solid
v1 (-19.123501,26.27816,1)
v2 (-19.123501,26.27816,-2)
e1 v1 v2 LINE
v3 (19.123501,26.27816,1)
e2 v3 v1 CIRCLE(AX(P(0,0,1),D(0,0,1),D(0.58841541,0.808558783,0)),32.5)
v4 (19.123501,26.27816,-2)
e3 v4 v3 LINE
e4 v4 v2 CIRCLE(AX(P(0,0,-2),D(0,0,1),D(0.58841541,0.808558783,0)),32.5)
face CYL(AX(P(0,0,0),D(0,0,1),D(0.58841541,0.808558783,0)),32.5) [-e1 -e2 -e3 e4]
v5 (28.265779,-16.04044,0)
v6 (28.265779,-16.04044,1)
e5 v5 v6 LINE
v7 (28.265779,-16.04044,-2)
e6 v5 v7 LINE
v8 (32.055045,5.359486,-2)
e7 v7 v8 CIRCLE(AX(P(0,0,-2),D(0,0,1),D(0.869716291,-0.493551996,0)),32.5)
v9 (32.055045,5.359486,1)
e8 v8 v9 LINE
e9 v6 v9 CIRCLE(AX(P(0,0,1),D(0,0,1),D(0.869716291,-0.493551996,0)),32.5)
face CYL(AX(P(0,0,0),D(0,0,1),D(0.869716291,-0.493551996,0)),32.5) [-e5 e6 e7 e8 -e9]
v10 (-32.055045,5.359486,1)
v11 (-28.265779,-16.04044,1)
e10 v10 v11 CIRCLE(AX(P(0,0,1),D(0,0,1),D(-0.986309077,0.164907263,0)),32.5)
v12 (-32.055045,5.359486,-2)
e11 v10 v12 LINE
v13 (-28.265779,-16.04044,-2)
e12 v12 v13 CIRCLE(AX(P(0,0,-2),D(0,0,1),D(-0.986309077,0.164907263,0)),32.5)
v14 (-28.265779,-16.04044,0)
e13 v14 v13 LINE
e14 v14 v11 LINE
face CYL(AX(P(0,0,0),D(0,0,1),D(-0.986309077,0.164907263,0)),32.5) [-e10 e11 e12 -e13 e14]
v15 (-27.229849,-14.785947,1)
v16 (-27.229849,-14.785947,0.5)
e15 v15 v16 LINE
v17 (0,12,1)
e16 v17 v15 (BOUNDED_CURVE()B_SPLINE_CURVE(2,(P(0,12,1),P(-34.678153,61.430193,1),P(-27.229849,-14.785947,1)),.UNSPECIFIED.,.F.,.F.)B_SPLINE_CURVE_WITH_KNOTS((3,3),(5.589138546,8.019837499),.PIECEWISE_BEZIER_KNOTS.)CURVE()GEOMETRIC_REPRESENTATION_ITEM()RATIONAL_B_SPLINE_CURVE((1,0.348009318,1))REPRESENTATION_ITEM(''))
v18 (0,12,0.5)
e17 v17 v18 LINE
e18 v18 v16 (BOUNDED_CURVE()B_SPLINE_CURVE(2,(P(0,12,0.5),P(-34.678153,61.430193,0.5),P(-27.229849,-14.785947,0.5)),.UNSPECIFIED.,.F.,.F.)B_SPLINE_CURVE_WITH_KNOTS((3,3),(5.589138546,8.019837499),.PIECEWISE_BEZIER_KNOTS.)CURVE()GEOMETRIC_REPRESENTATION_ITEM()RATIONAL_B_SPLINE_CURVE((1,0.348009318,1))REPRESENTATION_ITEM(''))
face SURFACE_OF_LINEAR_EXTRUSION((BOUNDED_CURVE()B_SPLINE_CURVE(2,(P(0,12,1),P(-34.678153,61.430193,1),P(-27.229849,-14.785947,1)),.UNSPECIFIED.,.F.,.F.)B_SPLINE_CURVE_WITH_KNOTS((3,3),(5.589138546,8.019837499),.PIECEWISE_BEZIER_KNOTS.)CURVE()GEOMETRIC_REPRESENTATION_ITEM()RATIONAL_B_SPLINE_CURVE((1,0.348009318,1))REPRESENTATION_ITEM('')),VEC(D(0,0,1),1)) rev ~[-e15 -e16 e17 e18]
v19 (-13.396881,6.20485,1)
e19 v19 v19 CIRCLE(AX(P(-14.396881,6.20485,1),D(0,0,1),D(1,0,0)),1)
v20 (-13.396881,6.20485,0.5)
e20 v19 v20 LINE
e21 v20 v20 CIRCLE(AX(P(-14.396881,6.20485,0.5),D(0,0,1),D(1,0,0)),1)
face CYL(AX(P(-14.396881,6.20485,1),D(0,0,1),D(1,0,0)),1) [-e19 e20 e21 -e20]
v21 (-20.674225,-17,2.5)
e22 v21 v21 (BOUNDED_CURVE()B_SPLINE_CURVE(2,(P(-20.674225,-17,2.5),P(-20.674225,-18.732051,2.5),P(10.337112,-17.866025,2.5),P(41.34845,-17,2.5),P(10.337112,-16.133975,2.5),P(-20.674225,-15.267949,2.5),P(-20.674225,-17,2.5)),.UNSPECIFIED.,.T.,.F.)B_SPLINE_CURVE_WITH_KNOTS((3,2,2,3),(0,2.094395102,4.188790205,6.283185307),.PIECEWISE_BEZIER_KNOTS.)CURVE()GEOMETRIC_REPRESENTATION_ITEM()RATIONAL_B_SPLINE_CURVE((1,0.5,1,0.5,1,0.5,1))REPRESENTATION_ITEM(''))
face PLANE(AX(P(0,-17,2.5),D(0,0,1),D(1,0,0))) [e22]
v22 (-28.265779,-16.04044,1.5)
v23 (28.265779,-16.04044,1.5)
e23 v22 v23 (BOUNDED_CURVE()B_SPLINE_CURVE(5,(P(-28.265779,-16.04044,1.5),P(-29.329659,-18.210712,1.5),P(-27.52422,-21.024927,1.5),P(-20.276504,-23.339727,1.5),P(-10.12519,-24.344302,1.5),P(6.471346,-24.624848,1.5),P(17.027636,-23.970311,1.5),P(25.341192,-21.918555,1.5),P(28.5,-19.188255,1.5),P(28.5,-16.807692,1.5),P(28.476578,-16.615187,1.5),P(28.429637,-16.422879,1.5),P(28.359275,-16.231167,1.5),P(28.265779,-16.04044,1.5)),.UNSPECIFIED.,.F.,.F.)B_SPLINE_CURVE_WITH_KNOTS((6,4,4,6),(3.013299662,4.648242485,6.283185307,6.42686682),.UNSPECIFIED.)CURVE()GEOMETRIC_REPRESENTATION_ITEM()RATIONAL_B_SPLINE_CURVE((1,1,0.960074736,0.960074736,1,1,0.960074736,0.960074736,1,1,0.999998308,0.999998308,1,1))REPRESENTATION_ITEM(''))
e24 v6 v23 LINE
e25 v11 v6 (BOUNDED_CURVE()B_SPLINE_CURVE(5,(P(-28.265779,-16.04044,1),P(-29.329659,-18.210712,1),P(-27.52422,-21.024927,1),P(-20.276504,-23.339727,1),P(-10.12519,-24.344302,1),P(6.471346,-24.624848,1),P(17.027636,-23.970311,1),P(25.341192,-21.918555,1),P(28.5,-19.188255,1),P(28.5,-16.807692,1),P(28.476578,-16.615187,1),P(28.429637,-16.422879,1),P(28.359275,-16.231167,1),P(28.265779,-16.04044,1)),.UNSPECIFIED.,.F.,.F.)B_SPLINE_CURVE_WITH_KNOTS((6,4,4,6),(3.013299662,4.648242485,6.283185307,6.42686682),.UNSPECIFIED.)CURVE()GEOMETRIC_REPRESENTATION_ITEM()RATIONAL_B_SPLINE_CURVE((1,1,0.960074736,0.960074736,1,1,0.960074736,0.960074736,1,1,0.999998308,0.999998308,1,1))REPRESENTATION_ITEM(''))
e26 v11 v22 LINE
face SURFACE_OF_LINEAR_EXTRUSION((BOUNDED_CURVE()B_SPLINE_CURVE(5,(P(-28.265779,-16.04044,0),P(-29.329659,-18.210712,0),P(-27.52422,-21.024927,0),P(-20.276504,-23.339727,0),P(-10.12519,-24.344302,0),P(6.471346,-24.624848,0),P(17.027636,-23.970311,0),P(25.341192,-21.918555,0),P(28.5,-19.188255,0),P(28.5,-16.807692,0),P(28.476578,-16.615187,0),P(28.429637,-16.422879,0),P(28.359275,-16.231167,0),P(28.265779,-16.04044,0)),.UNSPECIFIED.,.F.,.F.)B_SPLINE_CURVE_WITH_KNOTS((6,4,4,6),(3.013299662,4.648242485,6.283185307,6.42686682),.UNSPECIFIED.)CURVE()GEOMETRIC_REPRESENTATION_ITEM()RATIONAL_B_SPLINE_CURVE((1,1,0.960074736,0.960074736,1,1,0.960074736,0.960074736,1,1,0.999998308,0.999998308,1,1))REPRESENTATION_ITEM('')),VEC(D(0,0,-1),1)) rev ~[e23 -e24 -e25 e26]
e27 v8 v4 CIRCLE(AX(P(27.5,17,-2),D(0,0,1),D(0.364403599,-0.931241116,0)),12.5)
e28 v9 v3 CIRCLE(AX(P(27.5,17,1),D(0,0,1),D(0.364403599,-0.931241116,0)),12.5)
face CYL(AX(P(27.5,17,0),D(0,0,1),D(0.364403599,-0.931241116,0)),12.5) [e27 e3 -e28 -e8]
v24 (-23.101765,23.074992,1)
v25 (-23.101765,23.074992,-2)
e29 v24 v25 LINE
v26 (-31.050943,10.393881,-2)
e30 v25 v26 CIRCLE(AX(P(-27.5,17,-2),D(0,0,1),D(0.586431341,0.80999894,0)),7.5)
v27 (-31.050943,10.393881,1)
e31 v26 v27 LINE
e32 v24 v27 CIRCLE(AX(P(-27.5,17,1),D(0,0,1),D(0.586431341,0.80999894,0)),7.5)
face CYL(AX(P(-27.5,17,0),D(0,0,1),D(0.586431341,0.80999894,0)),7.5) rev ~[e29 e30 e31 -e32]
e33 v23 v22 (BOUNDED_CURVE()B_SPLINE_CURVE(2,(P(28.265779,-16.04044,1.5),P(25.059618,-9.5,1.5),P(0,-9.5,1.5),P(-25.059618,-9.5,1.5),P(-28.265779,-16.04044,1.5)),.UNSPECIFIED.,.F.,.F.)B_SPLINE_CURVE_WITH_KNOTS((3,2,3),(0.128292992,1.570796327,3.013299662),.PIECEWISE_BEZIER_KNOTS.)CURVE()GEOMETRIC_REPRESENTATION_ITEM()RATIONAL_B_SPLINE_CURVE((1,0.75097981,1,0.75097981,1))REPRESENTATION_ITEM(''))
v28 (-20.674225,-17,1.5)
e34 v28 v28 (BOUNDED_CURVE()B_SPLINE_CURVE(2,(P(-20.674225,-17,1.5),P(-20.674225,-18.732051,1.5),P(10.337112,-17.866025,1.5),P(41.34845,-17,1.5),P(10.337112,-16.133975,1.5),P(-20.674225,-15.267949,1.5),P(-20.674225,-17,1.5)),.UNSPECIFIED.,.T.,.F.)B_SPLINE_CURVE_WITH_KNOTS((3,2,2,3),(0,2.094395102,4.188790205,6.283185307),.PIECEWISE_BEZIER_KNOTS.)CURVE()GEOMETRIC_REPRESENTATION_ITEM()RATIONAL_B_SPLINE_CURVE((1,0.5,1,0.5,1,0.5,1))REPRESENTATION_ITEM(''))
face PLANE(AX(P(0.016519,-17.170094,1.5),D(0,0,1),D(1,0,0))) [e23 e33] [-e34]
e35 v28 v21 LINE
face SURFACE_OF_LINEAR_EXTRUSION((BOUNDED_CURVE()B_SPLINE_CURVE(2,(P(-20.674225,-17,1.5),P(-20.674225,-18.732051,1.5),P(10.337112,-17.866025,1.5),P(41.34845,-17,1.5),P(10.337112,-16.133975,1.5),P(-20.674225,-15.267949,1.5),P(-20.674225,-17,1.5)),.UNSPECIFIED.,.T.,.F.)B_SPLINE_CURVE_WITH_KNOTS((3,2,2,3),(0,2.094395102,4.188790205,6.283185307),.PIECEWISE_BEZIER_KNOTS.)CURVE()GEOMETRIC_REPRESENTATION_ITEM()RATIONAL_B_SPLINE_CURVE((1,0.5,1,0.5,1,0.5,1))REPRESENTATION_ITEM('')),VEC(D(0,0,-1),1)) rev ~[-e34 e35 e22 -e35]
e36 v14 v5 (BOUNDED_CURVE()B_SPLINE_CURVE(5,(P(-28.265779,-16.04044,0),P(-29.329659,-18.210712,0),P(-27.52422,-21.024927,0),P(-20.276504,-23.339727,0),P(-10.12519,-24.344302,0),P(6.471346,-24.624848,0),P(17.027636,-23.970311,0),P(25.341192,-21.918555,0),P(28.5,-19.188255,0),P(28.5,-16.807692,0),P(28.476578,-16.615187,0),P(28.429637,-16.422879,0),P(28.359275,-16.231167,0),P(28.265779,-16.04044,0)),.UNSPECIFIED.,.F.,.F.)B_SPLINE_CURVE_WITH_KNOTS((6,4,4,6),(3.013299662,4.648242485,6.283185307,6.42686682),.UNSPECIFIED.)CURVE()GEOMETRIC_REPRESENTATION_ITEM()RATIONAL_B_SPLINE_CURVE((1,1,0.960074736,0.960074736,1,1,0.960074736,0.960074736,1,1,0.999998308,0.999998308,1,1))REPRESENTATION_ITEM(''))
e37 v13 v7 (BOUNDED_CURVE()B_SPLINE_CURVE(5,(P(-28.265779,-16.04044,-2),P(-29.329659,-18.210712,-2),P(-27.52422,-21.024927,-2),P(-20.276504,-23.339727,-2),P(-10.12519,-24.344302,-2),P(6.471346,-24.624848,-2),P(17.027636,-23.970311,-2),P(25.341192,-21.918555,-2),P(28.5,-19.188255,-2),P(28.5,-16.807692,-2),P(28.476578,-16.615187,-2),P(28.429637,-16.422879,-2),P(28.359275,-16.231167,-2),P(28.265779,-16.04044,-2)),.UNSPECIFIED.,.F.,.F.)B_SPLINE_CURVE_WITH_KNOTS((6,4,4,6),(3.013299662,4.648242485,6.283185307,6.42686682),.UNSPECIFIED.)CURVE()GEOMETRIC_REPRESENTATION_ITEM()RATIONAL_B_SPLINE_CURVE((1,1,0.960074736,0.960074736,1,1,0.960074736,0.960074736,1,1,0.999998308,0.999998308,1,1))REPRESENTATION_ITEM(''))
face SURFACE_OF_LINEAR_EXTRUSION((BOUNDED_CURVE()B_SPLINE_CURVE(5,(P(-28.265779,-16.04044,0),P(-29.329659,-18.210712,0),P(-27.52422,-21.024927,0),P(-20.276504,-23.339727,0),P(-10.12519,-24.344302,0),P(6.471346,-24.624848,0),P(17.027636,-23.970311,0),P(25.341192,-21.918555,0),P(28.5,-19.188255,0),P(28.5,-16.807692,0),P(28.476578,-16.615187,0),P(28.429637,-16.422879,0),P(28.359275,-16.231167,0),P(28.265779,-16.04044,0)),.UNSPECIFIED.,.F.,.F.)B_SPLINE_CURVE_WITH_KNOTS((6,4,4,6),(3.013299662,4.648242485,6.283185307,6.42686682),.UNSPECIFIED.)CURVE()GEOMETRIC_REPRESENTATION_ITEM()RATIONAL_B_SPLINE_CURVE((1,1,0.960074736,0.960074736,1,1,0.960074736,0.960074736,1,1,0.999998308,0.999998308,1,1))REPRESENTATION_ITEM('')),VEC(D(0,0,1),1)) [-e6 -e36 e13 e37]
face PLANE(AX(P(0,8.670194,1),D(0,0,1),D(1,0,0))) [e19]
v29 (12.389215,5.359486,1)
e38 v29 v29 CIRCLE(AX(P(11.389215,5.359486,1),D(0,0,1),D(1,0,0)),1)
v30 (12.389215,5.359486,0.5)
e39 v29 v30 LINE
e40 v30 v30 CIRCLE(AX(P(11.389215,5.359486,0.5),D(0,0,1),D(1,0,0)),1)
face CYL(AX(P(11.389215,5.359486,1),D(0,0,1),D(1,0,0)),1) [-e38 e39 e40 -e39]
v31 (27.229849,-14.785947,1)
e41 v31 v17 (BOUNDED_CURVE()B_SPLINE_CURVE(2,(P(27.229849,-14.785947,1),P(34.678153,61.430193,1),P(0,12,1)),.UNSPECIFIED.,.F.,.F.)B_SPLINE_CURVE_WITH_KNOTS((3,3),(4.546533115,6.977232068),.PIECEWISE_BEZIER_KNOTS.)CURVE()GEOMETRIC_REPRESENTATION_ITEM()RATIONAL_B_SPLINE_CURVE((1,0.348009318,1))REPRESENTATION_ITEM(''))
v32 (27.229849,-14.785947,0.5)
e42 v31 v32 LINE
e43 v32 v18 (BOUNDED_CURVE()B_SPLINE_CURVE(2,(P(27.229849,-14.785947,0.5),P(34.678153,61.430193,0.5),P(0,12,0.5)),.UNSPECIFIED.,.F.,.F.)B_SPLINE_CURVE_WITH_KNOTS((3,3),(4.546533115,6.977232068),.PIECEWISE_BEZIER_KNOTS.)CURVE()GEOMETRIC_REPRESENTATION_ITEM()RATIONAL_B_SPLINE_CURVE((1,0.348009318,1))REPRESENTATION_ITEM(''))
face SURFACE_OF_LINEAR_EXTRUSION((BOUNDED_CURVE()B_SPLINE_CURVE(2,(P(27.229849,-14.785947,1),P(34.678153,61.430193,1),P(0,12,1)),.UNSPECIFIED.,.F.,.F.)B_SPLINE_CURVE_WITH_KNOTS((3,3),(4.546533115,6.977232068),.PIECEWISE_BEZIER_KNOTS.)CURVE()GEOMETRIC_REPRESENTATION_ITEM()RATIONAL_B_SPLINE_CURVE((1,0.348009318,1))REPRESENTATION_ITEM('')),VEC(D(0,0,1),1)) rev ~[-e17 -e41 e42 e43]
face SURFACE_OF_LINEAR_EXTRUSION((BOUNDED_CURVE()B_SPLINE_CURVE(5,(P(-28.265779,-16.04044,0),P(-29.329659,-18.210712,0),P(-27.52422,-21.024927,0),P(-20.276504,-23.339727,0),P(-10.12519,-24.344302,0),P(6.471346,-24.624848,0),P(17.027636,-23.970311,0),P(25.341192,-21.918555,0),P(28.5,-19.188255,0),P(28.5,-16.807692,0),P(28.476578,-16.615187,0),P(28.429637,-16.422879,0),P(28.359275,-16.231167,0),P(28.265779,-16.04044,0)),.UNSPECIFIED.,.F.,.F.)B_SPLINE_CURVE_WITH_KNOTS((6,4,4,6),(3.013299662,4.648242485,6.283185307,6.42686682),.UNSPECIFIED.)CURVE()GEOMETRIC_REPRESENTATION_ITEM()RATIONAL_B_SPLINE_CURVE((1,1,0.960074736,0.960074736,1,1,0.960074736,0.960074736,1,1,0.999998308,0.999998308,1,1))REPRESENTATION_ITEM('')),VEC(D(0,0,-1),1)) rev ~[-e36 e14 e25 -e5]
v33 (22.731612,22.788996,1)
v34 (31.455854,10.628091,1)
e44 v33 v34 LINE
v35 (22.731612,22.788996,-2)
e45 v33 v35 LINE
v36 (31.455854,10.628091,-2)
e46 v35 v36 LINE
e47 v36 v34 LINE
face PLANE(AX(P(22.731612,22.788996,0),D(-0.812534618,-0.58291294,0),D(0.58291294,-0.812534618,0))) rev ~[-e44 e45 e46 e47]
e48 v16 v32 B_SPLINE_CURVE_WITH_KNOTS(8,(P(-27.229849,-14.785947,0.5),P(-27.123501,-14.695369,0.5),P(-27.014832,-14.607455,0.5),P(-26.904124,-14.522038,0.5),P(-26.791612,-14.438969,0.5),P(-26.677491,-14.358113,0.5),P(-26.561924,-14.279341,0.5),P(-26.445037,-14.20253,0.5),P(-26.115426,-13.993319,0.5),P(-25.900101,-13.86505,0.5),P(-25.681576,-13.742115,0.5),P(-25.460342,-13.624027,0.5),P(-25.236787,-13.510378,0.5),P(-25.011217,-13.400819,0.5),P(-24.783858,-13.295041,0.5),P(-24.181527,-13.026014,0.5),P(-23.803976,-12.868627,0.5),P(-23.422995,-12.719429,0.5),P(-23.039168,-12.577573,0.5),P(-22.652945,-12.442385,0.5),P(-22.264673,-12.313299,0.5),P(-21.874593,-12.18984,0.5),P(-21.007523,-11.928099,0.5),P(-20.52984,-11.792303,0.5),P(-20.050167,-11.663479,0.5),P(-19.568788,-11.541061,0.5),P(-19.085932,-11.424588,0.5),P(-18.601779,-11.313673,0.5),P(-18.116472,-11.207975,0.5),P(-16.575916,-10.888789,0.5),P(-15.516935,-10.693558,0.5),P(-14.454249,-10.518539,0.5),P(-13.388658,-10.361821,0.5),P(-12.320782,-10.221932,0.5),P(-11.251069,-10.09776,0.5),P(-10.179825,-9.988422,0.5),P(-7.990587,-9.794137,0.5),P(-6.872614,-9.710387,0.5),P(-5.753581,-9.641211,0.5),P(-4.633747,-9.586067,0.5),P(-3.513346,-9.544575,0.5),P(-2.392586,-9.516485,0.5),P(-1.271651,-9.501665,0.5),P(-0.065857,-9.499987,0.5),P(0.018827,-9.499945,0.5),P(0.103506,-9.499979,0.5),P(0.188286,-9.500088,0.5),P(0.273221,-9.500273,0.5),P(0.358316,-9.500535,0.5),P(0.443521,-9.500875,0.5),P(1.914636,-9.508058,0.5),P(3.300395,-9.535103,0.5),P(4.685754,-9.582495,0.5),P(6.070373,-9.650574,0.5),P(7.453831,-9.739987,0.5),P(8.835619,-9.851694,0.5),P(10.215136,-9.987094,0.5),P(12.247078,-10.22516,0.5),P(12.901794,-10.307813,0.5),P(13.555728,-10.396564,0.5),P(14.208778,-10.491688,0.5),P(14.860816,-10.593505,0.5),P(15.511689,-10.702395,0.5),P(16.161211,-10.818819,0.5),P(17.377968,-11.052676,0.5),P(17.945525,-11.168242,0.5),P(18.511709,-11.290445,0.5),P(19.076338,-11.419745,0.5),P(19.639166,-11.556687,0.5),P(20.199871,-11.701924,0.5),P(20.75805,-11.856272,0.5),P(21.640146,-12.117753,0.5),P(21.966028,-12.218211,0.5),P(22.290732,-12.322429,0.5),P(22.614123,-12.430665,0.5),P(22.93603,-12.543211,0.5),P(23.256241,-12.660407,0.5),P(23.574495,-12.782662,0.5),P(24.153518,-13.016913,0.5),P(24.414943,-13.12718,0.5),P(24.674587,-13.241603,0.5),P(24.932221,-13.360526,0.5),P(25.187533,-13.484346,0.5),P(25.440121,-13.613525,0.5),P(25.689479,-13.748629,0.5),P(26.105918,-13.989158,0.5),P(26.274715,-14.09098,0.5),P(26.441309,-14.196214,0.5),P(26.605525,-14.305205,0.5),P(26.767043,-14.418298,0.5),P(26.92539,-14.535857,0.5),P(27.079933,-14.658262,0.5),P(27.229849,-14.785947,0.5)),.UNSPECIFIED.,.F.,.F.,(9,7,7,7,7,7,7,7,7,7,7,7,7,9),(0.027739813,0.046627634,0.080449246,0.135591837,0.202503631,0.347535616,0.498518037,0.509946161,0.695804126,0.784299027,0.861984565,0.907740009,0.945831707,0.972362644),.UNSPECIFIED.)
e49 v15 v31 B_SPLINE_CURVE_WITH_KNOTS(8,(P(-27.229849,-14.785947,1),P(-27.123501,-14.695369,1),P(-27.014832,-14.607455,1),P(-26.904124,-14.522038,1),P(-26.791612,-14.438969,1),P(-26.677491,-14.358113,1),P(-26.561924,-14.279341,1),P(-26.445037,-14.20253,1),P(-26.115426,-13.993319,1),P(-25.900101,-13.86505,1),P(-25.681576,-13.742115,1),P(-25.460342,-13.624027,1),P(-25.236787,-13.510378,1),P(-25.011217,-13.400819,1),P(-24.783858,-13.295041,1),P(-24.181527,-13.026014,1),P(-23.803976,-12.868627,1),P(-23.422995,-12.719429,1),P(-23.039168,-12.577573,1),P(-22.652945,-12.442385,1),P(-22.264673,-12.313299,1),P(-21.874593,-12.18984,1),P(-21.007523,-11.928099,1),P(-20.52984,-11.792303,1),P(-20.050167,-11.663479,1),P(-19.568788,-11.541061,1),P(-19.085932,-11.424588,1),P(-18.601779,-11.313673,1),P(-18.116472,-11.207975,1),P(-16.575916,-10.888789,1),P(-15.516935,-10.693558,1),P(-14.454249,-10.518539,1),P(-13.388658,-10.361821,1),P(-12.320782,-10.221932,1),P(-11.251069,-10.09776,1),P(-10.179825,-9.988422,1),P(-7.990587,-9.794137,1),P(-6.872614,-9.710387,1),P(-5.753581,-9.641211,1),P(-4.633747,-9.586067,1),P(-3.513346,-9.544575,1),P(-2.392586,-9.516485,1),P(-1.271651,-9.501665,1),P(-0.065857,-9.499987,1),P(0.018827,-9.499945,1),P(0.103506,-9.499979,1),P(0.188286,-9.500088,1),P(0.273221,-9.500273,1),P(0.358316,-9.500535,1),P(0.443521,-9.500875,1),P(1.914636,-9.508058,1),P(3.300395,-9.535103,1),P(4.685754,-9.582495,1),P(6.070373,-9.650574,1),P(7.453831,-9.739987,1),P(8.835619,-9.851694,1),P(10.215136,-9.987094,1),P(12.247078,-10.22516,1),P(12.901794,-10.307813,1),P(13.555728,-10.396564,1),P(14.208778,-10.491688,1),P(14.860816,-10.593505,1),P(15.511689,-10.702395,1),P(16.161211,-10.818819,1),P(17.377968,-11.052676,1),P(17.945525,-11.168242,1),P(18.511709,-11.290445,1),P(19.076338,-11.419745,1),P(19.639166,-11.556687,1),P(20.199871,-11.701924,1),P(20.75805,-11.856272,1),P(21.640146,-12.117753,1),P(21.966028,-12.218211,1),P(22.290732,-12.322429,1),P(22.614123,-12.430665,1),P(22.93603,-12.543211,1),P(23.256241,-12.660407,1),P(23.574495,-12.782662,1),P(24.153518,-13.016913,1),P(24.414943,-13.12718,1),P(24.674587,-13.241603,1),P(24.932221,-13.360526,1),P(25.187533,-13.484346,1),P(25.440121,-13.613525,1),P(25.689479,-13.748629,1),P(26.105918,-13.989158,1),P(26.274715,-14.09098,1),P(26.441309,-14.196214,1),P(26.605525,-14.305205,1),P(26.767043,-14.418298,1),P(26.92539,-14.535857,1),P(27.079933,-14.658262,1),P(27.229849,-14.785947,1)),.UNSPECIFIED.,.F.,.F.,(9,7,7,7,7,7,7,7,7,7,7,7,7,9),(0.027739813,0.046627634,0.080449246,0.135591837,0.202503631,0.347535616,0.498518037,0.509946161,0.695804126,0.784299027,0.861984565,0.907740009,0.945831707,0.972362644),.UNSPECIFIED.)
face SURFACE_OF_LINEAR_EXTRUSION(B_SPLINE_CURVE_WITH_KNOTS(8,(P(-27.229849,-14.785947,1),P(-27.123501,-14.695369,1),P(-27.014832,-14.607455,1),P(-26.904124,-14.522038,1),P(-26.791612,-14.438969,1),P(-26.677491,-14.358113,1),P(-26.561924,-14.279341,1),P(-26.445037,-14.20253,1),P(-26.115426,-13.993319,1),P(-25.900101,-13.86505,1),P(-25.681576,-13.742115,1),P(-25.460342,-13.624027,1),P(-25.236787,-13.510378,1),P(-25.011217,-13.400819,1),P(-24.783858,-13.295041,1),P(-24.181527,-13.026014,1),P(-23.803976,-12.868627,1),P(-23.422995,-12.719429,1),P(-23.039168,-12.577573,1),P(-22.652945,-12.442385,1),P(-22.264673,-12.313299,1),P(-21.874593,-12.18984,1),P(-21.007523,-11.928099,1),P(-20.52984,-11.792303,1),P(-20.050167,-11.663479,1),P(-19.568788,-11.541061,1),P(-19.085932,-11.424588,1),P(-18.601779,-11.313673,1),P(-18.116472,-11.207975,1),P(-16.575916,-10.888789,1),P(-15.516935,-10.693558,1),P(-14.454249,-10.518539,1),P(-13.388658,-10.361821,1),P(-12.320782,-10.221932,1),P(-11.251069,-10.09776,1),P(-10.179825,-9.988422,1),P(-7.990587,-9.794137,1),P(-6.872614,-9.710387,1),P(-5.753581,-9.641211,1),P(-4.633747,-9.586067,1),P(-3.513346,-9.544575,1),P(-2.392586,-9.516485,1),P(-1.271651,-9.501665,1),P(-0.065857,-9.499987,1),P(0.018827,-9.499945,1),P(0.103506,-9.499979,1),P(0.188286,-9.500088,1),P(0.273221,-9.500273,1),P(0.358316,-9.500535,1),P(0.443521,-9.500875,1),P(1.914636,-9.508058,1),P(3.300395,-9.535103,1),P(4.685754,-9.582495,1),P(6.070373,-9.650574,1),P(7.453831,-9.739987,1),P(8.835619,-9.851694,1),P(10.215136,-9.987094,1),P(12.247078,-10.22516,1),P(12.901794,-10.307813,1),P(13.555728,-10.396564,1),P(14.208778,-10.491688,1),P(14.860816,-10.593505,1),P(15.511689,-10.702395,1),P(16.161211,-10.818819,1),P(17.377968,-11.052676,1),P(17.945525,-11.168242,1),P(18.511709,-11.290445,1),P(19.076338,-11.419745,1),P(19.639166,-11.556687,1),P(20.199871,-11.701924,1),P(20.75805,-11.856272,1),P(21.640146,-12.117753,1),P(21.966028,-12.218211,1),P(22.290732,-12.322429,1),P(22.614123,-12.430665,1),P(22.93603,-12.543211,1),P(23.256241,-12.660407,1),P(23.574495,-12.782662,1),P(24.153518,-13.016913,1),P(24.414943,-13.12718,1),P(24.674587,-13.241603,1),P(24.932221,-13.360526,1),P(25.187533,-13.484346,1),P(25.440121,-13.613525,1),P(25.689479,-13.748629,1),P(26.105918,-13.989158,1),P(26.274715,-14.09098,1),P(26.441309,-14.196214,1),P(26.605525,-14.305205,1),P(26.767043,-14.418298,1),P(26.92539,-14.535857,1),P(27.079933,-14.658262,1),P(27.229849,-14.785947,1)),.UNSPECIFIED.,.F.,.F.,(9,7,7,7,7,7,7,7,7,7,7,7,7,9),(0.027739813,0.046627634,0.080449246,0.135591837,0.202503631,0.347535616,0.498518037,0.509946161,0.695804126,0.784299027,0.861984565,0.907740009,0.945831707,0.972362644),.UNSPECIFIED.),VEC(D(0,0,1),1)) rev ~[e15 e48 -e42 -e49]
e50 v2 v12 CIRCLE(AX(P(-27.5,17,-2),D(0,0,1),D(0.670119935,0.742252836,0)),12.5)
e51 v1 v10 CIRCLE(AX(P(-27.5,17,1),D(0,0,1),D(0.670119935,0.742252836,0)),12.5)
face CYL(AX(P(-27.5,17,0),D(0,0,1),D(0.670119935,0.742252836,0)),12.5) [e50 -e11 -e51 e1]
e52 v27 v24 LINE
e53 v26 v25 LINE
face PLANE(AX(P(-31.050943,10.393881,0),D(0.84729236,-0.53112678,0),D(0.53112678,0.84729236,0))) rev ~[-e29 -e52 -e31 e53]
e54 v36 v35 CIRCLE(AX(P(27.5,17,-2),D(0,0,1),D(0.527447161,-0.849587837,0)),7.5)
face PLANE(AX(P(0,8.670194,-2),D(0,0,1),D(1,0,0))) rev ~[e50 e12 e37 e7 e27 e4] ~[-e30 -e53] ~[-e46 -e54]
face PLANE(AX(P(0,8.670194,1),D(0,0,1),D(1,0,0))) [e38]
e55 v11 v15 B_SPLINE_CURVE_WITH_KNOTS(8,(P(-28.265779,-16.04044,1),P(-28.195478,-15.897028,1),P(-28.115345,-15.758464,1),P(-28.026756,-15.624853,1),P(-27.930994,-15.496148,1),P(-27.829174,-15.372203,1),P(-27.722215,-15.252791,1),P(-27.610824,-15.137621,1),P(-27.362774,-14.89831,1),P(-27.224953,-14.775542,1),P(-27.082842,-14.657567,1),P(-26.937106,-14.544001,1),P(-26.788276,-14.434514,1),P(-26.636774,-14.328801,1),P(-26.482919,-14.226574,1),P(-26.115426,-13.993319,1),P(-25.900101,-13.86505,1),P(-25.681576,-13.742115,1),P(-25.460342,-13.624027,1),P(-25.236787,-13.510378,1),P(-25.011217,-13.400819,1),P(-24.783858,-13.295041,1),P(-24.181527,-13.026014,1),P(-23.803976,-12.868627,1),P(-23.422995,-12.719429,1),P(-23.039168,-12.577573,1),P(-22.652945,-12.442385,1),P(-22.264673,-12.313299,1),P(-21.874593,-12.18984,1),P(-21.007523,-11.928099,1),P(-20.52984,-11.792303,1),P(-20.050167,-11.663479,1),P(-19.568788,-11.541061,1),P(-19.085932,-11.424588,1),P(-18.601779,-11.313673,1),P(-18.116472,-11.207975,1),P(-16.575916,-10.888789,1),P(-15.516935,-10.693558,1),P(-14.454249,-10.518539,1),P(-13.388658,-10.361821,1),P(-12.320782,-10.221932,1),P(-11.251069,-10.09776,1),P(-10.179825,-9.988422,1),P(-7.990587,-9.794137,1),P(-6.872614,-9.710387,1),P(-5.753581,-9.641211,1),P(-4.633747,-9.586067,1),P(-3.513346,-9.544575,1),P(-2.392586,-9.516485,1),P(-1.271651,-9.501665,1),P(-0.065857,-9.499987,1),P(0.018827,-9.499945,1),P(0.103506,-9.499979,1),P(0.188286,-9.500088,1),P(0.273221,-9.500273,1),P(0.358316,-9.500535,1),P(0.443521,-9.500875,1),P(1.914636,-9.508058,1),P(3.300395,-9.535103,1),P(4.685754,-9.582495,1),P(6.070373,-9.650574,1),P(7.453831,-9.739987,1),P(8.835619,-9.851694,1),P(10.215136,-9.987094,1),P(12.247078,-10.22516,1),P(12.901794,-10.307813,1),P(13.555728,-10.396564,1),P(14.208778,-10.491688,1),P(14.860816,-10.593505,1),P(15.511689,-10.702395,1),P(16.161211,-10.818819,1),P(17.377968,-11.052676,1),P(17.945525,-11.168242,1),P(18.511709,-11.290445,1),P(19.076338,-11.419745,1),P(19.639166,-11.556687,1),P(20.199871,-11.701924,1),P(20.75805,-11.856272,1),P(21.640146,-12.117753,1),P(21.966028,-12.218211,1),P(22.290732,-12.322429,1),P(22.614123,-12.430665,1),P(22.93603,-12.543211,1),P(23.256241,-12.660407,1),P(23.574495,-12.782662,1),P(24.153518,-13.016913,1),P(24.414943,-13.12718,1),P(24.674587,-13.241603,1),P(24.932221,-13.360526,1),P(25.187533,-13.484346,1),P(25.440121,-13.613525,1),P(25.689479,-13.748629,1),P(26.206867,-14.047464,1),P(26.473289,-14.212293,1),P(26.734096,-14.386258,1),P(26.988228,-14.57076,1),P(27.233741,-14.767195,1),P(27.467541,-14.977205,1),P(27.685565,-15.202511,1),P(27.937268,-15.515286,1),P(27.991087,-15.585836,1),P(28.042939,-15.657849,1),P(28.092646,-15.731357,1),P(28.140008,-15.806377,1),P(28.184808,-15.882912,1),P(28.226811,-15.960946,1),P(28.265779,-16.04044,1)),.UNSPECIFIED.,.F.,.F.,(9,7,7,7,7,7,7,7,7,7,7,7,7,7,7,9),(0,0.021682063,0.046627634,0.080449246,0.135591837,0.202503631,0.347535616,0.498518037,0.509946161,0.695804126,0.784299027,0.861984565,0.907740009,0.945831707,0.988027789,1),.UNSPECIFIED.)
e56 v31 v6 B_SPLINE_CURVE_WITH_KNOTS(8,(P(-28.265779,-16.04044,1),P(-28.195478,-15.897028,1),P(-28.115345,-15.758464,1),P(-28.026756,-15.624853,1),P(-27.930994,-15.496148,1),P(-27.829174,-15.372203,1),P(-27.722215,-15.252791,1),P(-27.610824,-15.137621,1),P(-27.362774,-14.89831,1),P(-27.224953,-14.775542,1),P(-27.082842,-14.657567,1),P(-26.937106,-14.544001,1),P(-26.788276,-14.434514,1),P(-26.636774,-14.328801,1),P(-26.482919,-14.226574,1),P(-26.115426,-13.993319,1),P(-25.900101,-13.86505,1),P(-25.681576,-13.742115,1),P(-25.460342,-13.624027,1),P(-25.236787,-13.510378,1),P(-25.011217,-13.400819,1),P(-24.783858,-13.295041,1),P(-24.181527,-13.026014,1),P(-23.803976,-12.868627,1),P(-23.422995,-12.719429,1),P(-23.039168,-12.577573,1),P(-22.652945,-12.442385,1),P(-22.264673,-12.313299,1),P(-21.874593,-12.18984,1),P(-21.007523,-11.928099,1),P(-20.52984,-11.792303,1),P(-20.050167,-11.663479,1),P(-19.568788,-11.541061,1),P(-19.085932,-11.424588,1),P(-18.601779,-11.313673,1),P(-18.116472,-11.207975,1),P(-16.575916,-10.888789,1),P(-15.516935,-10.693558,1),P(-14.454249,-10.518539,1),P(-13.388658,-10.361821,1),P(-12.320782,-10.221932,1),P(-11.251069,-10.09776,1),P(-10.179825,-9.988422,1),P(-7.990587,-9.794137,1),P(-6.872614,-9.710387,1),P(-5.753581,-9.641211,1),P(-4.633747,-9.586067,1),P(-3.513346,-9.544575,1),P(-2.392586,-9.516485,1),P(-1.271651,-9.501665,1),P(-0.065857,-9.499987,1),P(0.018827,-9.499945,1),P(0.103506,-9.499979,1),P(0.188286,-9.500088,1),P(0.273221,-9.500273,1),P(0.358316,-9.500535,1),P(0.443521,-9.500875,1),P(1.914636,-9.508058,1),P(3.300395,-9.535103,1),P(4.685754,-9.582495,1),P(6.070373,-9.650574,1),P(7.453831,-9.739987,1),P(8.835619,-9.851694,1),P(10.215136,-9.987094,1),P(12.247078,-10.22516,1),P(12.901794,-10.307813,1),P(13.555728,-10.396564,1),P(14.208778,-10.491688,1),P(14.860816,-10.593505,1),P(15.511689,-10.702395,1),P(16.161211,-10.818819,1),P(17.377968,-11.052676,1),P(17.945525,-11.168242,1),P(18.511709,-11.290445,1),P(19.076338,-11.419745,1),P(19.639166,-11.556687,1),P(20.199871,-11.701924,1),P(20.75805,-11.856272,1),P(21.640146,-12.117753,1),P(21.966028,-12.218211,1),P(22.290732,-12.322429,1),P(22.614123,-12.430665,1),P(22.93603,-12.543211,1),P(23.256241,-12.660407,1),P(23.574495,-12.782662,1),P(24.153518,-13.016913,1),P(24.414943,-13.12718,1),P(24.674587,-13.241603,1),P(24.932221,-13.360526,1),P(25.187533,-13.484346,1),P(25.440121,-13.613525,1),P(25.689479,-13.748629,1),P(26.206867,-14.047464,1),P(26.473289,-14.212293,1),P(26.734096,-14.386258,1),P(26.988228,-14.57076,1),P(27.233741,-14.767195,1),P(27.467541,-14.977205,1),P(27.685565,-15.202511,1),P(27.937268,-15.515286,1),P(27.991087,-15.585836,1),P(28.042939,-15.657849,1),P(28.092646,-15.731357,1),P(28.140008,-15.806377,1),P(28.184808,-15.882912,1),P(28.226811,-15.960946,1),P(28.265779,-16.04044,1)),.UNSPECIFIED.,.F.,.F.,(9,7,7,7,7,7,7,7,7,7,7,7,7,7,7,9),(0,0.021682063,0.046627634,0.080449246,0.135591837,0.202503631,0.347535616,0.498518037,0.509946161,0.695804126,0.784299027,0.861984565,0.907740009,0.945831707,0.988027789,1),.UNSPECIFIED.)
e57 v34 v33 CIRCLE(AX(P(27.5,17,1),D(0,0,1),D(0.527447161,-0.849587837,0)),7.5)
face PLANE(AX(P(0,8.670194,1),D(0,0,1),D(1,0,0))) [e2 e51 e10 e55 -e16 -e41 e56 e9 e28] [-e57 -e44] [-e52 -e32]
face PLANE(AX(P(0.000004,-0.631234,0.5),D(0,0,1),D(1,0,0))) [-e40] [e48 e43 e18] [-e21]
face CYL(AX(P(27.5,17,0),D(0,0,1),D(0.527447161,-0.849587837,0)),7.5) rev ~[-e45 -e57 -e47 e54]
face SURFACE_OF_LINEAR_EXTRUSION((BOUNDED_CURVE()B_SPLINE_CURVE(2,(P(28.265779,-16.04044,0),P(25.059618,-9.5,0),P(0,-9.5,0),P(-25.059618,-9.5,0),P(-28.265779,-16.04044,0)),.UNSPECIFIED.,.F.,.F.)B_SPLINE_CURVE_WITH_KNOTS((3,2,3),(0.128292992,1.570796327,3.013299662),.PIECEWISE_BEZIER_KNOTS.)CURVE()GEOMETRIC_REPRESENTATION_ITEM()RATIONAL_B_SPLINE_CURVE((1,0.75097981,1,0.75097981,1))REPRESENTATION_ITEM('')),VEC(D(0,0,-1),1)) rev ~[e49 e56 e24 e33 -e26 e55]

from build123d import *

# Parameters (mm, degrees)
F1_DEPTH = 1
F2_DEPTH = 1.5
F3_R     = 1
F4_DEPTH = 0.5
F6_DEPTH = 25
F8_DEPTH = 1
F9_DEPTH = 2


with BuildPart() as f1:
    # F0 (on Top) → F1 (new body)
    with BuildSketch(Plane.XY):
        with BuildLine():
            ThreePointArc((-19.1235008121, 26.278160451), (-38.1324321193, 23.5727762192), (-32.0550449903, 5.359486045))
            ThreePointArc((-32.0550449903, 5.359486045), (-32.0021823164, -5.6665974787), (-28.2657794627, -16.0404398744))
            add(Edge.make_bspline(
                [(28.2657794627, -16.0404398744), (25.0596180916, -9.5), (0, -9.5), (-25.0596180916, -9.5), (-28.2657794627, -16.0404398744)],
                knots=[0.1282929916, 0.1282929916, 0.1282929916, 1.5707963268, 1.5707963268, 3.013299662, 3.013299662, 3.013299662], degree=2, weights=[1, 0.75097981, 1, 0.75097981, 1]))
            ThreePointArc((28.2657794627, -16.0404398744), (32.0021823164, -5.6665974787), (32.0550449903, 5.359486045))
            ThreePointArc((32.0550449903, 5.359486045), (38.1324321193, 23.5727762192), (19.1235008121, 26.278160451))
            ThreePointArc((19.1235008121, 26.278160451), (0, 32.5), (-19.1235008121, 26.278160451))
        make_face()
        with BuildLine():
            add(Edge.make_bspline(
                [(28.2657794627, -16.0404398744), (25.0596180916, -9.5), (0, -9.5), (-25.0596180916, -9.5), (-28.2657794627, -16.0404398744)],
                knots=[0.1282929916, 0.1282929916, 0.1282929916, 1.5707963268, 1.5707963268, 3.013299662, 3.013299662, 3.013299662], degree=2, weights=[1, 0.75097981, 1, 0.75097981, 1]))
            add(Edge.make_bspline(
                [(-28.2657794627, -16.0404398744), (-32.1538432676, -23.9719332087), (-1.8269216338, -24.4845748919), (28.5, -24.9972165751), (28.5, -17)],
                knots=[3.013299662, 3.013299662, 3.013299662, 4.6482424846, 4.6482424846, 6.2831853072, 6.2831853072, 6.2831853072], degree=2, weights=[1, 0.6840677914, 1, 0.6840677914, 1]))
            add(Edge.make_bspline(
                [(28.5, -17), (28.5, -16.518240323), (28.2657794627, -16.0404398744)],
                knots=[0, 0, 0, 0.1282929916, 0.1282929916, 0.1282929916], degree=2, weights=[1, 0.9979433189, 1]))
        make_face()
    extrude(amount=F1_DEPTH)

    # F0 (on Top) → F2 (join)
    with BuildSketch(Plane.XY):
        with BuildLine():
            add(Edge.make_bspline(
                [(28.2657794627, -16.0404398744), (25.0596180916, -9.5), (0, -9.5), (-25.0596180916, -9.5), (-28.2657794627, -16.0404398744)],
                knots=[0.1282929916, 0.1282929916, 0.1282929916, 1.5707963268, 1.5707963268, 3.013299662, 3.013299662, 3.013299662], degree=2, weights=[1, 0.75097981, 1, 0.75097981, 1]))
            add(Edge.make_bspline(
                [(-28.2657794627, -16.0404398744), (-32.1538432676, -23.9719332087), (-1.8269216338, -24.4845748919), (28.5, -24.9972165751), (28.5, -17)],
                knots=[3.013299662, 3.013299662, 3.013299662, 4.6482424846, 4.6482424846, 6.2831853072, 6.2831853072, 6.2831853072], degree=2, weights=[1, 0.6840677914, 1, 0.6840677914, 1]))
            add(Edge.make_bspline(
                [(28.5, -17), (28.5, -16.518240323), (28.2657794627, -16.0404398744)],
                knots=[0, 0, 0, 0.1282929916, 0.1282929916, 0.1282929916], degree=2, weights=[1, 0.9979433189, 1]))
        make_face()
    extrude(amount=F2_DEPTH)

    # F3 (on face) → F4 (cut)
    with BuildSketch(Plane.XY.offset(1)):
        with BuildLine():
            add(Edge.make_bspline(
                [(27.2298485398, -14.785946603), (34.6781532449, 61.4301931961), (0, 12)],
                knots=[4.5465331149, 4.5465331149, 4.5465331149, 6.9772320681, 6.9772320681, 6.9772320681], degree=2, weights=[1, 0.348009318, 1]))
            add(Edge.make_bspline(
                [(0, 12), (-34.6781532449, 61.4301931961), (-27.2298485398, -14.785946603)],
                knots=[5.5891385462, 5.5891385462, 5.5891385462, 8.0198374994, 8.0198374994, 8.0198374994], degree=2, weights=[1, 0.348009318, 1]))
            add(Edge.make_bspline(
                [(-27.2298485438, -14.7859465983), (-27.1235005909, -14.6953694452), (-27.0148324256, -14.6074553179), (-26.9041242662, -14.5220377708), (-26.7916116729, -14.4389689728), (-26.6774911689, -14.3581129382), (-26.5619238942, -14.2793410628), (-26.4450372953, -14.2025299637), (-26.1154259475, -13.9933190312), (-25.9001007444, -13.8650502344), (-25.6815764788, -13.7421154762), (-25.4603422242, -13.6240265652), (-25.2367872003, -13.5103782123), (-25.0112167389, -13.4008190797), (-24.7838582265, -13.2950409799), (-24.1815269893, -13.0260138383), (-23.8039763572, -12.8686274032), (-23.4229953928, -12.7194286319), (-23.0391676676, -12.5775726359), (-22.6529452943, -12.442384814), (-22.2646725462, -12.3132991432), (-21.8745928745, -12.1898396478), (-21.0075231865, -11.9280985148), (-20.5298402909, -11.7923034154), (-20.0501673244, -11.6634792789), (-19.5687883822, -11.5410606749), (-19.0859317536, -11.4245881786), (-18.6017794799, -11.3136725414), (-18.1164723782, -11.2079754108), (-16.5759163532, -10.8887891981), (-15.5169354155, -10.6935580552), (-14.4542494004, -10.5185387591), (-13.3886584475, -10.3618210579), (-12.3207818781, -10.2219317761), (-11.2510694701, -10.0977602294), (-10.1798249497, -9.9884221743), (-7.9905872411, -9.7941373106), (-6.872614176, -9.7103865584), (-5.7535809166, -9.6412114374), (-4.6337472088, -9.586067236), (-3.5133459581, -9.5445749391), (-2.3925855443, -9.5164852067), (-1.2716508776, -9.5016647144), (-0.0658567051, -9.4999867866), (0.0188272492, -9.4999449156), (0.103506139, -9.4999785093), (0.1882859732, -9.5000876991), (0.273221364, -9.500273079), (0.358315594, -9.5005353037), (0.4435206851, -9.5008746872), (1.9146357736, -9.5080581365), (3.300394752, -9.5351034815), (4.6857535149, -9.5824945952), (6.0703729366, -9.6505743409), (7.4538305978, -9.7399869052), (8.8356188507, -9.8516936697), (10.215135598, -9.987094422), (12.2470780769, -10.2251595717), (12.9017942823, -10.3078129902), (13.5557282033, -10.3965638624), (14.2087777108, -10.491687712), (14.8608158428, -10.5935051159), (15.5116886245, -10.7023952032), (16.1612112004, -10.8188191074), (17.3779682579, -11.0526761832), (17.9455245563, -11.1682417081), (18.5117085891, -11.2904454713), (19.0763384267, -11.419745162), (19.6391657791, -11.5566868167), (20.1998710662, -11.7019244141), (20.7580501445, -11.8562724484), (21.6401455013, -12.1177532327), (21.9660283027, -12.2182108793), (22.2907322232, -12.322429107), (22.6141230493, -12.430665212), (22.9360300506, -12.5432111617), (23.2562413481, -12.6604065516), (23.5744953864, -12.7826620273), (24.1535181548, -13.0169134178), (24.4149432173, -13.1271804164), (24.6745873797, -13.2416031142), (24.9322211673, -13.3605257562), (25.187532615, -13.4843455592), (25.4401209542, -13.613525357), (25.6894788059, -13.748629127), (26.1059183514, -13.9891577643), (26.2747150273, -14.0909802774), (26.4413094594, -14.1962143234), (26.6055249122, -14.3052048432), (26.7670432139, -14.418298237), (26.9253904774, -14.5358566012), (27.0799325858, -14.6582621601), (27.2298485569, -14.7859465829)],
                knots=[0.0277398129, 0.0277398129, 0.0277398129, 0.0277398129, 0.0277398129, 0.0277398129, 0.0277398129, 0.0277398129, 0.0277398129, 0.046627634, 0.046627634, 0.046627634, 0.046627634, 0.046627634, 0.046627634, 0.046627634, 0.080449246, 0.080449246, 0.080449246, 0.080449246, 0.080449246, 0.080449246, 0.080449246, 0.1355918365, 0.1355918365, 0.1355918365, 0.1355918365, 0.1355918365, 0.1355918365, 0.1355918365, 0.202503631, 0.202503631, 0.202503631, 0.202503631, 0.202503631, 0.202503631, 0.202503631, 0.3475356161, 0.3475356161, 0.3475356161, 0.3475356161, 0.3475356161, 0.3475356161, 0.3475356161, 0.4985180369, 0.4985180369, 0.4985180369, 0.4985180369, 0.4985180369, 0.4985180369, 0.4985180369, 0.5099461608, 0.5099461608, 0.5099461608, 0.5099461608, 0.5099461608, 0.5099461608, 0.5099461608, 0.695804126, 0.695804126, 0.695804126, 0.695804126, 0.695804126, 0.695804126, 0.695804126, 0.7842990266, 0.7842990266, 0.7842990266, 0.7842990266, 0.7842990266, 0.7842990266, 0.7842990266, 0.8619845652, 0.8619845652, 0.8619845652, 0.8619845652, 0.8619845652, 0.8619845652, 0.8619845652, 0.9077400087, 0.9077400087, 0.9077400087, 0.9077400087, 0.9077400087, 0.9077400087, 0.9077400087, 0.9458317068, 0.9458317068, 0.9458317068, 0.9458317068, 0.9458317068, 0.9458317068, 0.9458317068, 0.972362644, 0.972362644, 0.972362644, 0.972362644, 0.972362644, 0.972362644, 0.972362644, 0.972362644, 0.972362644], degree=8))
        make_face()
        with Locations((-14.3968807533, 6.2048500404)):
            Circle(F3_R, mode=Mode.SUBTRACT)
        with Locations((11.3892154768, 5.359486045)):
            Circle(F3_R, mode=Mode.SUBTRACT)
    extrude(amount=-F4_DEPTH, mode=Mode.SUBTRACT)

    # F5 (on face) → F6 (cut)
    with BuildSketch(Plane.XY.offset(1)):
        with BuildLine():
            Line((-31.0509426966, 10.3938811723), (-23.101764943, 23.074992048))
            ThreePointArc((-23.101764943, 23.074992048), (-33.8546927027, 20.9834508474), (-31.0509426966, 10.3938811723))
        make_face()
        with BuildLine():
            ThreePointArc((31.4558537042, 10.6280912224), (33.5940096319, 21.3718470474), (22.7316116782, 22.788995838))
            Line((22.7316116782, 22.788995838), (31.4558537042, 10.6280912224))
        make_face()
    extrude(amount=-F6_DEPTH, mode=Mode.SUBTRACT)

    # F7 (on face) → F8 (join)
    with BuildSketch(Plane.XY.offset(1.5)):
        with BuildLine():
            add(Edge.make_bspline(
                [(-20.6742249429, -17), (-20.6742249429, -18.7320508076), (10.3371124715, -17.8660254038), (41.3484498858, -17), (10.3371124715, -16.1339745962), (-20.6742249429, -15.2679491924), (-20.6742249429, -17)],
                knots=[0, 0, 0, 2.0943951024, 2.0943951024, 4.1887902048, 4.1887902048, 6.2831853072, 6.2831853072, 6.2831853072], degree=2, weights=[1, 0.5, 1, 0.5, 1, 0.5, 1]))
        make_face()
    extrude(amount=F8_DEPTH)

    # F9 (add): a face of the model
    f9_faces = [f1.faces().sort_by_distance(p)[0] for p in [
        (0.0027966544, 4.1583376267, 0),
    ]]
    extrude(f9_faces, amount=F9_DEPTH)


solid = f1.part
